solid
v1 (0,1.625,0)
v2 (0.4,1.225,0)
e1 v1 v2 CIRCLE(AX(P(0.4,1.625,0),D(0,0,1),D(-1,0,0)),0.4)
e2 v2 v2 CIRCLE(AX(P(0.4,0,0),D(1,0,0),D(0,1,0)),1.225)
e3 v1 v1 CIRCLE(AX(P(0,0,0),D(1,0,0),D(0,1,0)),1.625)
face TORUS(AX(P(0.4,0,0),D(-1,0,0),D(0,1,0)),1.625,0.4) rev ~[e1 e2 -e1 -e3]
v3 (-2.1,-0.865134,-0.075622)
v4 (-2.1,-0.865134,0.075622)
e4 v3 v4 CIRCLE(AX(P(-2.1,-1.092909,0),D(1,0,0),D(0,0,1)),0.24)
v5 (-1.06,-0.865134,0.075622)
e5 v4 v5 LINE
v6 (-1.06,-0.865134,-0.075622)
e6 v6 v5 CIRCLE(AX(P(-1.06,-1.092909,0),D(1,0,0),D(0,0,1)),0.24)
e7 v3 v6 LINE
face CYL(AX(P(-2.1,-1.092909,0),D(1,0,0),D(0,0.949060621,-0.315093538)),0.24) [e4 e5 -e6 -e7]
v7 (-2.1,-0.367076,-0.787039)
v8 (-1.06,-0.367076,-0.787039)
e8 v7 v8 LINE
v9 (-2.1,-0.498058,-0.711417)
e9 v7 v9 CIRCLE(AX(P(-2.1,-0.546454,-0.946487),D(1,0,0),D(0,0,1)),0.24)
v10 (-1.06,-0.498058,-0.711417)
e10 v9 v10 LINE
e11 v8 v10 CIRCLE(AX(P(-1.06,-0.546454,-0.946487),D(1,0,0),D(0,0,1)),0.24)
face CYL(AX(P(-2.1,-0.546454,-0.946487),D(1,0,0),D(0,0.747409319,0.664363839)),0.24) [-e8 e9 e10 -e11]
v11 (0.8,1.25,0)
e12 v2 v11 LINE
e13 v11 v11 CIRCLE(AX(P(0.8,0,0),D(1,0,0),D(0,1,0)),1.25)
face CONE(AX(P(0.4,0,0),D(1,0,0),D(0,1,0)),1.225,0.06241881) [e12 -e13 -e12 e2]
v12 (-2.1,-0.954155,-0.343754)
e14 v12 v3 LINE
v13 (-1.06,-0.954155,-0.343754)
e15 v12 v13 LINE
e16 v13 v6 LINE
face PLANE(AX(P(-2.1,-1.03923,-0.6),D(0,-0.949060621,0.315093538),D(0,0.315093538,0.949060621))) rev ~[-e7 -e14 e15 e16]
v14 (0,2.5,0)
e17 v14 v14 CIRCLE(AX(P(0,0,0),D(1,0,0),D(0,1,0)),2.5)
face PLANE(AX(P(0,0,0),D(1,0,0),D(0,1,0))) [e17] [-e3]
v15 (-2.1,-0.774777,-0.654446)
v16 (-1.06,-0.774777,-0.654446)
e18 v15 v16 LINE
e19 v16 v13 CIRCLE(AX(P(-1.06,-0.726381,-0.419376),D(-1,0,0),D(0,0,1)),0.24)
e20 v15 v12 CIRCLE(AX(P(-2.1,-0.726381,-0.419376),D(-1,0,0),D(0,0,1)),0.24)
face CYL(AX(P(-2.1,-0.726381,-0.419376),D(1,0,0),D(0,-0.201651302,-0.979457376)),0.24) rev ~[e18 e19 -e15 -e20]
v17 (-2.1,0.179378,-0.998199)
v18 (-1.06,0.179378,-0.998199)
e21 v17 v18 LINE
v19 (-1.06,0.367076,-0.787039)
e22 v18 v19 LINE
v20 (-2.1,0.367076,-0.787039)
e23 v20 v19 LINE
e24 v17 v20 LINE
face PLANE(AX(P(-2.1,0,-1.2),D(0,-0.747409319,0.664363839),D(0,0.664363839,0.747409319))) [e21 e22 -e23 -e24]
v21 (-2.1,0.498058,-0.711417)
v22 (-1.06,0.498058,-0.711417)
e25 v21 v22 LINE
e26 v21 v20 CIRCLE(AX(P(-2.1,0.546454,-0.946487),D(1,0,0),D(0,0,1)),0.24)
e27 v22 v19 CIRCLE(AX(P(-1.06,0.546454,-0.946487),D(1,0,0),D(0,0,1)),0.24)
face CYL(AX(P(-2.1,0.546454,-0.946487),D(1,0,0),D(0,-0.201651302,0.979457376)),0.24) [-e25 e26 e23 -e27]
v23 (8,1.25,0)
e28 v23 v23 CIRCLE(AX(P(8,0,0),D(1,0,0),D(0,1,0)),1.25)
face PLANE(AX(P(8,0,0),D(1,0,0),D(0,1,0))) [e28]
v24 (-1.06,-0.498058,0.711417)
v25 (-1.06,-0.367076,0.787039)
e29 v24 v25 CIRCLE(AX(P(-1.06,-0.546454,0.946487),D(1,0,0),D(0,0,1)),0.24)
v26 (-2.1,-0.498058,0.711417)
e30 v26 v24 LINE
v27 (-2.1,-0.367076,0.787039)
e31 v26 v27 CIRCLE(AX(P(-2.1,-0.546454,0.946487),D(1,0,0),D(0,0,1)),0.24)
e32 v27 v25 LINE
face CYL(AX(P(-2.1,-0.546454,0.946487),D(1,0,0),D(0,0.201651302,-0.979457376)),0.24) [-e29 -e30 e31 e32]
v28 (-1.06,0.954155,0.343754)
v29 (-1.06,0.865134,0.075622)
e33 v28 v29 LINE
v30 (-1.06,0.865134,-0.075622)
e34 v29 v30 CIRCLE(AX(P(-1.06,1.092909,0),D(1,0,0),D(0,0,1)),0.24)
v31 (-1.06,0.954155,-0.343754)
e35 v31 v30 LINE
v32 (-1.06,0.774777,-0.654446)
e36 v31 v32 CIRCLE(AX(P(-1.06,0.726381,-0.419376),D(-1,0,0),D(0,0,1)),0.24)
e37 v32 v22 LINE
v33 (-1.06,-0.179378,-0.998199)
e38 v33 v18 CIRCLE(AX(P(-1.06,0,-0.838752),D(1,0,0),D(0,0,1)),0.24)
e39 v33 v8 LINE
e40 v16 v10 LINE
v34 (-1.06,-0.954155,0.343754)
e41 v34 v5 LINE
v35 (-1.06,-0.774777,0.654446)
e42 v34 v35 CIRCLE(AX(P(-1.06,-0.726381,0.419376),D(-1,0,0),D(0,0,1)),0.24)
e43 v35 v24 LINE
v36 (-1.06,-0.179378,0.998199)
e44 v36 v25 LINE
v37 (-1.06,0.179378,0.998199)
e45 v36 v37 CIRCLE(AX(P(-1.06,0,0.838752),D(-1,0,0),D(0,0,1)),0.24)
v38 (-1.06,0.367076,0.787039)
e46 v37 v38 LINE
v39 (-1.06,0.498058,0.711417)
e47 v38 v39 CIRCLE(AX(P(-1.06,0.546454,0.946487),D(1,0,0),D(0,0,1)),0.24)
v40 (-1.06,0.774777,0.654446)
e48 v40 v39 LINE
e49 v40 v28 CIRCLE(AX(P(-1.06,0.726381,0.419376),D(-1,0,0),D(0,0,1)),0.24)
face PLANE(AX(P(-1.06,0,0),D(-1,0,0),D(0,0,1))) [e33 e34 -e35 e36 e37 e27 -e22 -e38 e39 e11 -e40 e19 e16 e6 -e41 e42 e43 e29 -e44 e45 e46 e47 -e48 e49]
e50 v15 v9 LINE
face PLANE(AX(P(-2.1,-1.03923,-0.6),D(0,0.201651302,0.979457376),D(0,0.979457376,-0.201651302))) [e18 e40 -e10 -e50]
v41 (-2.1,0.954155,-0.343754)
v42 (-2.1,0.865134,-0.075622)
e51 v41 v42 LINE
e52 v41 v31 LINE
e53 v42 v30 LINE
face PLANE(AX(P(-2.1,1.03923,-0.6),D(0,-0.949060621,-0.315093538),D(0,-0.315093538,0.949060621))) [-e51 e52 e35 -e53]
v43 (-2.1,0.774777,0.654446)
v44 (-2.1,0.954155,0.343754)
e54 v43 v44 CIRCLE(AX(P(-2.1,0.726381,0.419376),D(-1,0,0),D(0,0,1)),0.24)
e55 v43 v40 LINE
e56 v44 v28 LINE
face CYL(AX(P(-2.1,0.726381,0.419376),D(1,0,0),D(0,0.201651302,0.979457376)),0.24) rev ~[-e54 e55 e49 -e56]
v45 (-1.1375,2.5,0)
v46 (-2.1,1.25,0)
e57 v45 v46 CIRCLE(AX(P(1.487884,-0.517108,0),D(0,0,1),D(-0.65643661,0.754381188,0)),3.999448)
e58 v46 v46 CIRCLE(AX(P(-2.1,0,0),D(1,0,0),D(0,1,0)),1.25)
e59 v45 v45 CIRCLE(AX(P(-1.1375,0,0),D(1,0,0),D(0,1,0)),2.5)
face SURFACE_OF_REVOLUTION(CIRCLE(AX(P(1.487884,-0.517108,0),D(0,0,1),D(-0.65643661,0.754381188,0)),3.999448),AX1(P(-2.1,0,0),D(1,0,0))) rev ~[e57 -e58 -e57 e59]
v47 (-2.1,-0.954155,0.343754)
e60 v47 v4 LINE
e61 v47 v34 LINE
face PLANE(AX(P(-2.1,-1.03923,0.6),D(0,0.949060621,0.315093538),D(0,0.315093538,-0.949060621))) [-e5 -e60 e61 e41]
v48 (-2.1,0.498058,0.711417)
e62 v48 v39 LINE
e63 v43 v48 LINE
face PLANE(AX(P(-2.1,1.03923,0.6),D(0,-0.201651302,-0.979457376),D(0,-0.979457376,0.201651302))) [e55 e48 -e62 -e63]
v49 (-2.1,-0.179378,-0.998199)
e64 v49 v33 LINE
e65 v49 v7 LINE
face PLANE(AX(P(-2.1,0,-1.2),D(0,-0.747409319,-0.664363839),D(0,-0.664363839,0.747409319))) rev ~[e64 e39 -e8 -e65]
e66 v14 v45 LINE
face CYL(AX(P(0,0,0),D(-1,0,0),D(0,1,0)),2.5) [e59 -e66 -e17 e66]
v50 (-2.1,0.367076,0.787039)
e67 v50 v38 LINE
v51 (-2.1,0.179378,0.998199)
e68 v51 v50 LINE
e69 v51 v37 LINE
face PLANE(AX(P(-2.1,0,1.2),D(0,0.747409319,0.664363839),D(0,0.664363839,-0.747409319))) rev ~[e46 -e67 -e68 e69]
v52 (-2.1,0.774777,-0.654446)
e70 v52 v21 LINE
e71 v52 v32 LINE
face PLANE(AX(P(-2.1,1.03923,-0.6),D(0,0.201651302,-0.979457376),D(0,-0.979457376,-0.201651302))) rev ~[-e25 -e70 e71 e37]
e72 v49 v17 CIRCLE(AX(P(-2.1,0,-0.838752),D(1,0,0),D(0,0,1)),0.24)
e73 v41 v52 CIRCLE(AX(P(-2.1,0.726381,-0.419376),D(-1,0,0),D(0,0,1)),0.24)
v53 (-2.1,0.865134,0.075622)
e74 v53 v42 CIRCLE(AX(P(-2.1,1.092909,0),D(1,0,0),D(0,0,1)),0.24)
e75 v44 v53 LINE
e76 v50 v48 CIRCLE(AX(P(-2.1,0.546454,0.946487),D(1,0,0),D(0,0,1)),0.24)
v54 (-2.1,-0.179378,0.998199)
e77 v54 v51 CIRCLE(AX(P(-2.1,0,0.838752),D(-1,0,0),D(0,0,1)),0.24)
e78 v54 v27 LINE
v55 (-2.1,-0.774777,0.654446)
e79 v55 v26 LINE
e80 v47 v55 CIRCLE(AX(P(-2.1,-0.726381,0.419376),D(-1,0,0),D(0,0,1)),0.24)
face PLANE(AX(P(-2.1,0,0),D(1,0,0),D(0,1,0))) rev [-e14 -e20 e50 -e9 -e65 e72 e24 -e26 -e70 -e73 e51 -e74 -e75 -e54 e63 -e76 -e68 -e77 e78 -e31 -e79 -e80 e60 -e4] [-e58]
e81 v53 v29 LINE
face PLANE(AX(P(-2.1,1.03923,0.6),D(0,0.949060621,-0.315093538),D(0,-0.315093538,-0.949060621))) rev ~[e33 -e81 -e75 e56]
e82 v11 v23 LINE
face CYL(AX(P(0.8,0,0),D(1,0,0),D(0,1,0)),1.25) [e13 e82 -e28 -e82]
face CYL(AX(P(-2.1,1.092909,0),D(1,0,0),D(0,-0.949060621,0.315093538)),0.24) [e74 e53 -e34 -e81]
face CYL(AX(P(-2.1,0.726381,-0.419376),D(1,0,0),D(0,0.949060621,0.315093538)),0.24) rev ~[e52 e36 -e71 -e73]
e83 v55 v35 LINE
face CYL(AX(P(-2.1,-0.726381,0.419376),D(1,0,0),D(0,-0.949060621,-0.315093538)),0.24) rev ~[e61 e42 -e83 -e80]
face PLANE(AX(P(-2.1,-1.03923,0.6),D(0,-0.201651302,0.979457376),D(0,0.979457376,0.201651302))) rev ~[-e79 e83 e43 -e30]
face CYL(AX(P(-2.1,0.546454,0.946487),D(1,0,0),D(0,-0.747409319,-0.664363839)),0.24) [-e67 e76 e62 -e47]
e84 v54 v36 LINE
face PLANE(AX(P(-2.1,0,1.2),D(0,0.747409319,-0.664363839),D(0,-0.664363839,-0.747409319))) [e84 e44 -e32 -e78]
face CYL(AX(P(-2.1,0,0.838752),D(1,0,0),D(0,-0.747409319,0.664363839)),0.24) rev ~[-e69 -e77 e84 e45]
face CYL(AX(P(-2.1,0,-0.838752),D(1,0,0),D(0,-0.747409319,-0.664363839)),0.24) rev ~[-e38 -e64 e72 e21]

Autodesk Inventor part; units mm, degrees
ref_plane "YZ Plane" through (0, 0, 0) normal (1, 0, 0) x (0, 1, 0)
ref_plane "XZ Plane" through (0, 0, 0) normal (0, 1, 0) x (-1, 0, 0)
ref_plane "XY Plane" through (0, 0, 0) normal (0, 0, 1) x (1, 0, 0)
sketch "Sketch4" plane through (0, 0, 0) normal (0, 0, 1) x (1, 0, 0)
  line L0 (-2.1, 0) -> (8, 0)
  line L1 (0, 0) -> (-2.1, 0)
  line L2 (0, 2.5) -> (0, 1.625)
  line L3 (0.4, 1.225) -> (0.4, 1.225)
  line L4 (0.4, 1.225) -> (0.8, 1.25)
  arc A0 (0, 1.625) -> (0.4, 1.225) centre (0.4, 1.625) ccw
  line L5 (-2.1, 0) -> (-2.1, 1.25)
  line L6 (0, 2.5) -> (-1.1375, 2.5)
  arc A1 (-1.1375, 2.5) -> (-2.1, 1.25) centre (1.4883, -0.5175) ccw
  line L7 (0.8, 1.25) -> (8, 1.25)
  line L8 (8, 1.25) -> (8, 0)
  point P0 (0, 1.225)
  dimension "d71" = 0.4
  dimension "d72" = 8
  dimension "d74" = 0.4
  dimension "d75" = 2.45
  dimension "d78" = 2.5
  dimension "d82" = 4
  dimension "d83" = 2.1
  dimension "d84" = 5
  dimension "d104" = 7.2
  dimension "d105" = 2.5
revolve "Revolution7" add sketch "Sketch4" angle 360 about axis through (-2.1, 0, 0) along (1, 0, 0)
sketch "Sketch5" plane through (-2.1, 0, 0) normal (-1, 0, 0) x (0, 0, 1)
  circle A0 centre (0, 0) radius 1.2 construction
  circle A1 centre (0, 0) radius 0.84 construction
  line L0 (0, 0) -> (-0.7275, 0.42)
  line L1 (0, 0) -> (-0.7275, -0.42)
  line L2 (-1.8008, 0) -> (1.7887, 0)
  line L3 (-1.2, 0) -> (-0.7275, -0.42)
  line L4 (-1.2, 0) -> (-0.7275, 0.42)
  dimension "d88" = 2.4
  dimension "d89" = 1.68
  dimension "d90" = 30
  dimension "d91" = 30
extrude "Extrusion1" cut sketch "Sketch5" against normal blind 1.04
pattern_circular "Circular Pattern1" count 6 over 360 about axis through (-10, 0, 0) along (1, 0, 0) of "Extrusion1"
fillet "Fillet1" radius 0.24 12 edges at (-1.58, -1.0392, -0.6) (-1.58, -0.42, -0.7275) (-1.58, -0.84, 0) (-1.58, -1.0392, 0.6) (-1.58, -0.42, 0.7275) (-1.58, 0, 1.2) (-1.58, 0.84, 0) (-1.58, 1.0392, 0.6) (-1.58, 0.42, 0.7275) (-1.58, 0.42, -0.7275) (-1.58, 0, -1.2) (-1.58, 1.0392, -0.6)
thread "Thread7" size "M2.5x0.45" class "6g" standard "ISO Metric profile" length 7.2
properties part number "Flachkopfschraube mit Innenrund ISO 14583 - M2,5 x 8 - A2-70" material "Edelstahl"
